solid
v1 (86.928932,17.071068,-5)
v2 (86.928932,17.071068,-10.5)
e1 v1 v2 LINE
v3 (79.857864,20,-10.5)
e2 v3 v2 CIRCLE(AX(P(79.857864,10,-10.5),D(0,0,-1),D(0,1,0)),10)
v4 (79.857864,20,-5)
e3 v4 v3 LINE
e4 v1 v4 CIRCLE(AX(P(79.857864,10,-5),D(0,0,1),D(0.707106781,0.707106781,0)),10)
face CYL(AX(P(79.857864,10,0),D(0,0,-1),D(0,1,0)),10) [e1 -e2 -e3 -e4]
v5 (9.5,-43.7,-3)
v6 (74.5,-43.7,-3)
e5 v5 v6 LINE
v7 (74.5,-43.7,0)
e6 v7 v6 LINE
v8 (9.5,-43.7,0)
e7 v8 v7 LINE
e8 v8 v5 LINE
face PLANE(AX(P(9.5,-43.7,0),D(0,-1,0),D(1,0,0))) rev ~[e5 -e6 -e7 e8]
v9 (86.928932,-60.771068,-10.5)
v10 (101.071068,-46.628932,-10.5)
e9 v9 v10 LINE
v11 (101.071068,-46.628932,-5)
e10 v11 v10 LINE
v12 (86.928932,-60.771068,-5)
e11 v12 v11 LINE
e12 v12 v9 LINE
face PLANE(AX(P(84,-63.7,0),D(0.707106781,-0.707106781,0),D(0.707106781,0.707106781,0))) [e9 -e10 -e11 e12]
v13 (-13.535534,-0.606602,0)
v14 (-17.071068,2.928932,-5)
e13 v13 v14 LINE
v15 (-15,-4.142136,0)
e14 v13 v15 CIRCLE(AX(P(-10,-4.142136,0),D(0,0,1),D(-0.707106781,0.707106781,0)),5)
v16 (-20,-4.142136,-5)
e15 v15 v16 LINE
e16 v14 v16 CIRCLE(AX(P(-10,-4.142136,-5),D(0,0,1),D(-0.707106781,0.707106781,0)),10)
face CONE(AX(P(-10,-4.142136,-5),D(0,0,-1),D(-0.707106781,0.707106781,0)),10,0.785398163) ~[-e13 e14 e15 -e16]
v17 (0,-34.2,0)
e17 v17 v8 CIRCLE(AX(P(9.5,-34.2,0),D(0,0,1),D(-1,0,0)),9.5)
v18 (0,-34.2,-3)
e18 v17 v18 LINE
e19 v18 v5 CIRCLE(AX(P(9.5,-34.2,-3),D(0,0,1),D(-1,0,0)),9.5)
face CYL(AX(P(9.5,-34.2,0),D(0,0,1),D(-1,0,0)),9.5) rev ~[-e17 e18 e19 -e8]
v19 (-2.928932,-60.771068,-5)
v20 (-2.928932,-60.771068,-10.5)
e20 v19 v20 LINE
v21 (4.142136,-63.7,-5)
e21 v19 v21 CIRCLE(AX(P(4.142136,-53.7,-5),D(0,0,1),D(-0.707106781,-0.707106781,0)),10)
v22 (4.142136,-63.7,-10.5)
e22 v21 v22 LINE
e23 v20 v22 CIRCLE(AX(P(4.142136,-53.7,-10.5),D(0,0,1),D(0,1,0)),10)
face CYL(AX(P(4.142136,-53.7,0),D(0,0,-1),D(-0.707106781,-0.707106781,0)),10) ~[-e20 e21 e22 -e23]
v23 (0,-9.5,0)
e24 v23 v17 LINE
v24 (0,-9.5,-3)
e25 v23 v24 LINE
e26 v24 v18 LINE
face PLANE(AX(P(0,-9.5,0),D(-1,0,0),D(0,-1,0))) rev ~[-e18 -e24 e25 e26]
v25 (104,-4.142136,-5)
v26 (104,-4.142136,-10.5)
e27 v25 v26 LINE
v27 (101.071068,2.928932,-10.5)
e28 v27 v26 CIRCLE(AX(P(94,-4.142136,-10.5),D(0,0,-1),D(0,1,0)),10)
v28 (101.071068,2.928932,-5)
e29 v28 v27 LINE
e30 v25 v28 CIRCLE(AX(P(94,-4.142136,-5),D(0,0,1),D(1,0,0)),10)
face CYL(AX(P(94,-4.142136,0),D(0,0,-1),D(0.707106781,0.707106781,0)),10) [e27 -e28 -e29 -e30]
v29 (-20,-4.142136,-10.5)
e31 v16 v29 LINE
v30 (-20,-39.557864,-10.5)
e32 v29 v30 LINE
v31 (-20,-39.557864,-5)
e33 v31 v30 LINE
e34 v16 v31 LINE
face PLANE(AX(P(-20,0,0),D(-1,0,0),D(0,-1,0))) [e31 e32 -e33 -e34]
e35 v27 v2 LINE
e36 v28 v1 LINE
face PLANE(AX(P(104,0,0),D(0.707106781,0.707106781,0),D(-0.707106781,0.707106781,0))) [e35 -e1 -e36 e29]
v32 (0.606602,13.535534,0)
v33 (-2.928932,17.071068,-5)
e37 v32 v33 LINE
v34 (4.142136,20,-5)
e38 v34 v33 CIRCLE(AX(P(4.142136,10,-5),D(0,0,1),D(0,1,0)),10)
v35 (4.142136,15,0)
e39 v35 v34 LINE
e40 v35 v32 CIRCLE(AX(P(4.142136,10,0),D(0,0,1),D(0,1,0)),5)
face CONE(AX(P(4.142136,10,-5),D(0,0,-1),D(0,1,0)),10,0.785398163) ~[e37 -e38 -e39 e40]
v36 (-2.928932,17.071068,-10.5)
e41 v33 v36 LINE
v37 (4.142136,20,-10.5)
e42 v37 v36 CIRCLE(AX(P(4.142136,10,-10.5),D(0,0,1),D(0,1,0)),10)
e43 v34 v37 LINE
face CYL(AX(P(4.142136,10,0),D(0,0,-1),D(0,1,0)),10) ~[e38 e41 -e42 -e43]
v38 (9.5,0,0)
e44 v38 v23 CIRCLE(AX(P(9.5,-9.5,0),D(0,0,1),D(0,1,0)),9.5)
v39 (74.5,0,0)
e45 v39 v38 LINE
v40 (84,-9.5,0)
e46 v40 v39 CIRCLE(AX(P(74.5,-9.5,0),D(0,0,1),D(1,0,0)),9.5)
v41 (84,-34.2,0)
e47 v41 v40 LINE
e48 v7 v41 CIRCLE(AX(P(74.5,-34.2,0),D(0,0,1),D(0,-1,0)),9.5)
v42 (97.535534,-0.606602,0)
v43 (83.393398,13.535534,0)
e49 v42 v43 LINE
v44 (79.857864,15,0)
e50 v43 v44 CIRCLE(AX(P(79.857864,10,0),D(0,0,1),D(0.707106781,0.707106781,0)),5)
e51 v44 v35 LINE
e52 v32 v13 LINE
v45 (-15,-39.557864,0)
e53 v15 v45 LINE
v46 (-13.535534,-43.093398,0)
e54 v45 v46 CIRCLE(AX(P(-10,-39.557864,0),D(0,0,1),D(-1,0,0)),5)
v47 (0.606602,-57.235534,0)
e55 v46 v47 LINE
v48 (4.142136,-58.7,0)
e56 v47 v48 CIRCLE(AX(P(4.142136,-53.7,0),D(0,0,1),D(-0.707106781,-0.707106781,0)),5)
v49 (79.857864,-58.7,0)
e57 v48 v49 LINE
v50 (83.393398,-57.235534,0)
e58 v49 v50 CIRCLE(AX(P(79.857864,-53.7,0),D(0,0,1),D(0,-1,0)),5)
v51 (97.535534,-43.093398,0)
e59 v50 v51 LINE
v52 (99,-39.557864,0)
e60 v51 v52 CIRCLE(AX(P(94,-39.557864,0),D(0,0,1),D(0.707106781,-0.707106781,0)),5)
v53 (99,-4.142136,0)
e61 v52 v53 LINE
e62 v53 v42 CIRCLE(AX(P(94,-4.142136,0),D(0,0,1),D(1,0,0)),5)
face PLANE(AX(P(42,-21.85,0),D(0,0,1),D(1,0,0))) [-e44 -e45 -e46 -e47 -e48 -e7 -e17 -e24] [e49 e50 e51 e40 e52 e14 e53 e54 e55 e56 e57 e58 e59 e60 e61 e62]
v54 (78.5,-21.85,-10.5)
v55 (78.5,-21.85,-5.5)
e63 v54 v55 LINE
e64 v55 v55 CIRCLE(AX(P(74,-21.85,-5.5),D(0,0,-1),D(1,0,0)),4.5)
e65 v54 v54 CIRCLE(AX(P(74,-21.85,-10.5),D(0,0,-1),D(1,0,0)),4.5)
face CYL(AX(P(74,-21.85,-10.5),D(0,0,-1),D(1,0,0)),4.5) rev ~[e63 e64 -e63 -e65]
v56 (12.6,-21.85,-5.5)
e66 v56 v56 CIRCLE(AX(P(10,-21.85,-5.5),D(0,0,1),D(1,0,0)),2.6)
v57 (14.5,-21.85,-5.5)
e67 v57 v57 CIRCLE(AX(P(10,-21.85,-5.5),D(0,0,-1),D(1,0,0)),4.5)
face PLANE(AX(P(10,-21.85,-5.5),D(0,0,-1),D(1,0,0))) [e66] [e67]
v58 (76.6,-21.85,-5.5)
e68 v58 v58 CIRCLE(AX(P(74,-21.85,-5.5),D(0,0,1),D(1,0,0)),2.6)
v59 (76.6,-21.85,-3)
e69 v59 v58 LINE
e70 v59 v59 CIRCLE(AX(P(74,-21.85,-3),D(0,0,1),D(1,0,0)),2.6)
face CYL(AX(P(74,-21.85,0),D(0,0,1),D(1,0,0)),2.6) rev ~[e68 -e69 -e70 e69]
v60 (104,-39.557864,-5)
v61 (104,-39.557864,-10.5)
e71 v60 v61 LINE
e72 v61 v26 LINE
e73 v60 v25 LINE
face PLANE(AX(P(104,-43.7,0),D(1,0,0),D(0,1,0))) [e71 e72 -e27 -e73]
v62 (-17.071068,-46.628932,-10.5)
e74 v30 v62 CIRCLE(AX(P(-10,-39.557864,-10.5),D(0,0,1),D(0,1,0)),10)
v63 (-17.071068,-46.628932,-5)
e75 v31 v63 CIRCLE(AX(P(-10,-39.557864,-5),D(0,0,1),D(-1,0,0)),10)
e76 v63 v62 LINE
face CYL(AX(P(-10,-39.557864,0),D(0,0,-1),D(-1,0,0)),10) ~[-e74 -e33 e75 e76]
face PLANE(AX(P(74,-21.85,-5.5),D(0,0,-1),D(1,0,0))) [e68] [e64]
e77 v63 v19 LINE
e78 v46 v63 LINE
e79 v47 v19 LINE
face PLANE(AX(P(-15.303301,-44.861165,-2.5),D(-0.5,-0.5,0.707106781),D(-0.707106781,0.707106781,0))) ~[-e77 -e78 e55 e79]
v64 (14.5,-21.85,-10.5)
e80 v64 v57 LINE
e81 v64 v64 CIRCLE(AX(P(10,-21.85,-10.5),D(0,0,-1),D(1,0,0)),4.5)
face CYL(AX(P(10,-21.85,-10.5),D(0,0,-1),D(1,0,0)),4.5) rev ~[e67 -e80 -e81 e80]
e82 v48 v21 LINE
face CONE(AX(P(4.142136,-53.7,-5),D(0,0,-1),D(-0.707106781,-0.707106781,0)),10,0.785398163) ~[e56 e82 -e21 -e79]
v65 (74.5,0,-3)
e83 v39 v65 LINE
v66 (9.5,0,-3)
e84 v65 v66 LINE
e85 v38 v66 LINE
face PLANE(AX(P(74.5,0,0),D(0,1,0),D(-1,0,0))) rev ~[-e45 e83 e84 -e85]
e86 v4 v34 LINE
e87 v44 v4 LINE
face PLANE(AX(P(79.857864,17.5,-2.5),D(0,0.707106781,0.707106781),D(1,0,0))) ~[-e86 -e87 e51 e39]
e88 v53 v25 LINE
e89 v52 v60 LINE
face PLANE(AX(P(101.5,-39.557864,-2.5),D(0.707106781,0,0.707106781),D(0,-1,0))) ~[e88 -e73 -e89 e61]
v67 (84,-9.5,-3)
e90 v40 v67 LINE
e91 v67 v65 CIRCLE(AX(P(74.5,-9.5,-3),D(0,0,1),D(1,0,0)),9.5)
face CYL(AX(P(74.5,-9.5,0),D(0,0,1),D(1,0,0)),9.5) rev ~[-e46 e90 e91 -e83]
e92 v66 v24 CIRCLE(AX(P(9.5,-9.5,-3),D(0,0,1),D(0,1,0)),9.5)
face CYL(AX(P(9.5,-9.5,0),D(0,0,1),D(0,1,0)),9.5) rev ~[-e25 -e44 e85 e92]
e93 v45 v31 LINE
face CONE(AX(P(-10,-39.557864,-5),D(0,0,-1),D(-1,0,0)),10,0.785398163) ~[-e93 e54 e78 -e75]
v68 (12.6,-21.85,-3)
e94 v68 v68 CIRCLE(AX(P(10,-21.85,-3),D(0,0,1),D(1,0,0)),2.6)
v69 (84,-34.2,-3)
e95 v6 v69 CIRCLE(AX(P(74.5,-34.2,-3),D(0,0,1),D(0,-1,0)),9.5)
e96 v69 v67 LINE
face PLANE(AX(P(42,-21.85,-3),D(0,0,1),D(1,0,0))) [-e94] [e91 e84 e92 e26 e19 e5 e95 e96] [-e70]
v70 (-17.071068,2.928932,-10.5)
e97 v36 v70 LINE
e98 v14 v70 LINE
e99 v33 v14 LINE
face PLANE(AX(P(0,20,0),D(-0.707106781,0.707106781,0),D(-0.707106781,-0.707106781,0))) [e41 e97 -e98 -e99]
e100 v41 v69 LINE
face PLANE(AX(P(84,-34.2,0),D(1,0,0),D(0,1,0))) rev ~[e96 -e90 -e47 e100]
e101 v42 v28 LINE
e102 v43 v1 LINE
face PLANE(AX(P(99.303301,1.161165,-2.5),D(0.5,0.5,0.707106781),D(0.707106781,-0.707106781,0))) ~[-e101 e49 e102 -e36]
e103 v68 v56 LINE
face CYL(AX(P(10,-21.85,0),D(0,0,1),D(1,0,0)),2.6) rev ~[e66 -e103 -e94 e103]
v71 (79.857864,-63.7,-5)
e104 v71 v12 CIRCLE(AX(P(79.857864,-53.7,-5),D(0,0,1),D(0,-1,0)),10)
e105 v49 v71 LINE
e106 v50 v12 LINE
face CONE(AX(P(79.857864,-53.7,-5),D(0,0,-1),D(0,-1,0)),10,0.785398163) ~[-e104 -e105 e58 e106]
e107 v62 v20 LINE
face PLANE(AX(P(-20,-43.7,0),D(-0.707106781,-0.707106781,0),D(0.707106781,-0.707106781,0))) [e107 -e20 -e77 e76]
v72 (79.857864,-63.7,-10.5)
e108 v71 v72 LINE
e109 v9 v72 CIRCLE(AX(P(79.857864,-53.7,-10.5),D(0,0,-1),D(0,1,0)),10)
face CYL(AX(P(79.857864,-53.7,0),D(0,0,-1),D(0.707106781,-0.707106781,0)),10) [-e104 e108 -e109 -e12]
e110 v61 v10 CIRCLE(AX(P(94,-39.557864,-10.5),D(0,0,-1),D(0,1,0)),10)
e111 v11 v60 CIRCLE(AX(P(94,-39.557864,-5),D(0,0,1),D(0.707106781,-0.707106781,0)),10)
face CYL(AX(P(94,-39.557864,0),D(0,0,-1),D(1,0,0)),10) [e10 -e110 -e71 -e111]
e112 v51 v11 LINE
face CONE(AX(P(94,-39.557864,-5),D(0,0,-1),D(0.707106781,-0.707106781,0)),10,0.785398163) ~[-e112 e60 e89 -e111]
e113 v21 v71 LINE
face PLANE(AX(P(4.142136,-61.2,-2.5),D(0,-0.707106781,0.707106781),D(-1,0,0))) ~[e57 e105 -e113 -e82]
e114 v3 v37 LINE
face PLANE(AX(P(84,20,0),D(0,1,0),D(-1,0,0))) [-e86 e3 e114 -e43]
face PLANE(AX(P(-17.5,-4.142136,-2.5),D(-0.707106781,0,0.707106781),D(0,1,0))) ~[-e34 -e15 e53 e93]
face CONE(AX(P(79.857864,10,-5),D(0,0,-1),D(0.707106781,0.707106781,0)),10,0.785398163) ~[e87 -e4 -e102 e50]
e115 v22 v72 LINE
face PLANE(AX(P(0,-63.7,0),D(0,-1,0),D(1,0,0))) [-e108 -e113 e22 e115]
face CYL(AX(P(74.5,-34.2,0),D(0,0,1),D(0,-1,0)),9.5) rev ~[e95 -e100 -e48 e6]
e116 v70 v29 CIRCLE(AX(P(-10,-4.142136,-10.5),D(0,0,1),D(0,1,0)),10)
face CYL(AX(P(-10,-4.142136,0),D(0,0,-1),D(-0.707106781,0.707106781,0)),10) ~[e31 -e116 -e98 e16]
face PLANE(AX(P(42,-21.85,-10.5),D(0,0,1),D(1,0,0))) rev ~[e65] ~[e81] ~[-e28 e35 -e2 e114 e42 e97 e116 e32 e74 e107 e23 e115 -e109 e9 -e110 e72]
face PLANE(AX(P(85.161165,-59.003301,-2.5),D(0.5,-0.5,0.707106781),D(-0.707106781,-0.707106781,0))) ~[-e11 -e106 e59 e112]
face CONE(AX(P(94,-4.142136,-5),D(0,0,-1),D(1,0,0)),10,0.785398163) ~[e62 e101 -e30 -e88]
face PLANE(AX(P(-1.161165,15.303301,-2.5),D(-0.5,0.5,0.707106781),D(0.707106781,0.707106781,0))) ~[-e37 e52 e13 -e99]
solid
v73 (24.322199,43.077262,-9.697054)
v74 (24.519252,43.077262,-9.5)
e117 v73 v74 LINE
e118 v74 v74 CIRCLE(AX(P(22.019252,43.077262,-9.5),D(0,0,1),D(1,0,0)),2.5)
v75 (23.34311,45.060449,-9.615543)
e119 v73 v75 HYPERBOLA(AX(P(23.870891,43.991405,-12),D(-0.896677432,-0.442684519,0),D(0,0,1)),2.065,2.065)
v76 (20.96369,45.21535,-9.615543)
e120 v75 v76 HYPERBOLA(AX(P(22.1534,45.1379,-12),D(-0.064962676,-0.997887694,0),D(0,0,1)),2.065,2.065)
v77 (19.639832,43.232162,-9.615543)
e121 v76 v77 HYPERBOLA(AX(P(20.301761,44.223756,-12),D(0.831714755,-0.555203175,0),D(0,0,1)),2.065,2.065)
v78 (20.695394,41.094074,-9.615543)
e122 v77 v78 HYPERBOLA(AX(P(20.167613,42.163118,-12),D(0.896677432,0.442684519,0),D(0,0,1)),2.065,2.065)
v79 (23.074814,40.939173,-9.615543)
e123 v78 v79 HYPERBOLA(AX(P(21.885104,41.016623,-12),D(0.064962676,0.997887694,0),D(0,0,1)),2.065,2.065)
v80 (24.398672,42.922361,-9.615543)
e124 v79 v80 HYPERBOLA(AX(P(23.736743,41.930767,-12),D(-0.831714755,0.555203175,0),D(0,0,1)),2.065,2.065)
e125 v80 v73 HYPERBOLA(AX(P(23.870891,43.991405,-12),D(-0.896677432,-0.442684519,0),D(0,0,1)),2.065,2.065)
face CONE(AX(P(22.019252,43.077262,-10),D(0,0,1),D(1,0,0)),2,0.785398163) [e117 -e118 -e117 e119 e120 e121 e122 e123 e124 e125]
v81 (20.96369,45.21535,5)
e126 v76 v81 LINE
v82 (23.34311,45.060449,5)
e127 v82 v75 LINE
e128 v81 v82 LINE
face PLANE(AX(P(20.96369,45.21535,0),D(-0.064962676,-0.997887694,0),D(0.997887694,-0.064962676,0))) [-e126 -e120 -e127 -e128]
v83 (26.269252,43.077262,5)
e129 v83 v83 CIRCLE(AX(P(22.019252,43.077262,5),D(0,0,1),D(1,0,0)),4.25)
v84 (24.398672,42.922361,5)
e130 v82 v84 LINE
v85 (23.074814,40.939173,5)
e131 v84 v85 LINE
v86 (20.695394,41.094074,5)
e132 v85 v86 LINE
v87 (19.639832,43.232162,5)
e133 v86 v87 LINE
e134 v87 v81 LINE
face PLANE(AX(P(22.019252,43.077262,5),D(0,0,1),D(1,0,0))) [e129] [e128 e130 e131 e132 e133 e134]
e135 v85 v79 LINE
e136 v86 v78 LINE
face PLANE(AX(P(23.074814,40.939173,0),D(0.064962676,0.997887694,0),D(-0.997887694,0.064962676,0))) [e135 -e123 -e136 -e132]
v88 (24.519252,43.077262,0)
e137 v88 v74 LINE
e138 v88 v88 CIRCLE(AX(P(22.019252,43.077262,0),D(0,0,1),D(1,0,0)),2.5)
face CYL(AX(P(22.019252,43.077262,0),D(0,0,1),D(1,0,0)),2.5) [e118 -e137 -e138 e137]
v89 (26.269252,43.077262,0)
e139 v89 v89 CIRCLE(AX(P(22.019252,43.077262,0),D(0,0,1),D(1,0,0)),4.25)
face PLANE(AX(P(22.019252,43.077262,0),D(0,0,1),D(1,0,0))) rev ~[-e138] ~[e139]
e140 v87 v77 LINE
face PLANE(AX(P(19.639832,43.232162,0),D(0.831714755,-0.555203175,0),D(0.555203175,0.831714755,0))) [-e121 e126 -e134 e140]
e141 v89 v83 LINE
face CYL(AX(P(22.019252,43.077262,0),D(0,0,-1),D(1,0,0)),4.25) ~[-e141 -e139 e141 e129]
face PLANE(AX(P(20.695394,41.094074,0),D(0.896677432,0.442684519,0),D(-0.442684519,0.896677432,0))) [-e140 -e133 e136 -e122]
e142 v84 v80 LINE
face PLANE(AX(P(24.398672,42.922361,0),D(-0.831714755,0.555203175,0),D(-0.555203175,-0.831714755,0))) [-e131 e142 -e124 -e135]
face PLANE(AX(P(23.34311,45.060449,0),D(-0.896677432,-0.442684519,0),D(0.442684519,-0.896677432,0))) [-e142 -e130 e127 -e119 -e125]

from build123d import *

# Parameters (mm, degrees)
F0_R     = 2.6
F1_DEPTH = 10.5
F2_DEPTH = 3
F3_R     = 10
F4_SIZE  = 5
F5_R     = 4.5
F6_DEPTH = 5
F0_R_2   = 4.25
F0_R_3   = 2.5
F7_DEPTH = 5
F8_DEPTH = 10


# Not quite as in the source:
# - a fillet or chamfer that OpenCascade refuses, or shapes differently, is made with other operations: its cross-section is extruded or revolved along the edge and cut away or added


with BuildPart() as f1:
    # F0 (on Top) → F1 (new body)
    with BuildSketch(Plane.XY):
        Polygon((84, 20), (0, 20), (-20, 0), (-20, -43.7), (0, -63.7), (84, -63.7), (104, -43.7), (104, 0), align=None)
        with BuildLine():
            Line((74.5, -43.7), (9.5, -43.7))
            ThreePointArc((9.5, -43.7), (2.7824855787, -40.9175144213), (0, -34.2))
            Line((0, -34.2), (0, -9.5))
            ThreePointArc((0, -9.5), (2.7824855787, -2.7824855787), (9.5, 0))
            Line((9.5, 0), (74.5, 0))
            ThreePointArc((74.5, 0), (81.2175144213, -2.7824855787), (84, -9.5))
            Line((84, -9.5), (84, -34.2))
            ThreePointArc((84, -34.2), (81.2175144213, -40.9175144213), (74.5, -43.7))
        make_face(mode=Mode.SUBTRACT)
        with BuildLine():
            ThreePointArc((0, -34.2), (2.7824855787, -40.9175144213), (9.5, -43.7))
            Line((9.5, -43.7), (74.5, -43.7))
            ThreePointArc((74.5, -43.7), (81.2175144213, -40.9175144213), (84, -34.2))
            Line((84, -34.2), (84, -9.5))
            ThreePointArc((84, -9.5), (81.2175144213, -2.7824855787), (74.5, 0))
            Line((74.5, 0), (9.5, 0))
            ThreePointArc((9.5, 0), (2.7824855787, -2.7824855787), (0, -9.5))
            Line((0, -9.5), (0, -34.2))
        make_face()
        with Locations((10, -21.85)):
            Circle(F0_R, mode=Mode.SUBTRACT)
        with Locations((74, -21.85)):
            Circle(F0_R, mode=Mode.SUBTRACT)
    extrude(amount=-F1_DEPTH)

    # F0 (on Top) → F2 (cut)
    with BuildSketch(Plane.XY):
        with BuildLine():
            ThreePointArc((0, -34.2), (2.7824855787, -40.9175144213), (9.5, -43.7))
            Line((9.5, -43.7), (74.5, -43.7))
            ThreePointArc((74.5, -43.7), (81.2175144213, -40.9175144213), (84, -34.2))
            Line((84, -34.2), (84, -9.5))
            ThreePointArc((84, -9.5), (81.2175144213, -2.7824855787), (74.5, 0))
            Line((74.5, 0), (9.5, 0))
            ThreePointArc((9.5, 0), (2.7824855787, -2.7824855787), (0, -9.5))
            Line((0, -9.5), (0, -34.2))
        make_face()
        with Locations((10, -21.85)):
            Circle(F0_R, mode=Mode.SUBTRACT)
        with Locations((74, -21.85)):
            Circle(F0_R, mode=Mode.SUBTRACT)
    extrude(amount=-F2_DEPTH, mode=Mode.SUBTRACT)

    # F3
    f3_edges = [f1.edges().sort_by_distance(p)[0] for p in [
        (0, 20, -5.25),
        (-20, 0, -5.25),
        (-20, -43.7, -5.25),
        (0, -63.7, -5.25),
        (84, -63.7, -5.25),
        (104, -43.7, -5.25),
        (104, 0, -5.25),
        (84, 20, -5.25),
    ]]
    fillet(f3_edges, radius=F3_R)

    # F4
    f4_edges = [f1.edges().sort_by_distance(p)[0] for p in [
        (42, -63.7, 0),
    ]]
    chamfer(f4_edges, length=F4_SIZE)

    # F5 (on face) → F6 (cut)
    with BuildSketch(Plane(origin=(0, 0, -10.5), x_dir=(1, 0, 0), z_dir=(0, 0, -1))):
        with Locations((74, 21.85)):
            Circle(F5_R)
        with Locations((10, 21.85)):
            Circle(F5_R)
    extrude(amount=-F6_DEPTH, mode=Mode.SUBTRACT)


with BuildPart() as f7:
    # F0 (on Top) → F7 (new body)
    with BuildSketch(Plane.XY):
        with Locations((22.0192523188, 43.0772615533)):
            Circle(F0_R_2)
        with Locations((22.0192523188, 43.0772615533)):
            Circle(F0_R_3, mode=Mode.SUBTRACT)
        with Locations((22.0192523188, 43.0772615533)):
            Circle(F0_R_3)
        Polygon((20.9636902895, 45.2153499835), (23.3431102003, 45.0604493011), (24.3986722296, 42.9223608708), (23.0748143481, 40.939173123), (20.6953944373, 41.0940738055), (19.639832408, 43.2321622357), align=None, mode=Mode.SUBTRACT)
    extrude(amount=F7_DEPTH)

    # F0 (on Top) → F8 (join)
    with BuildSketch(Plane.XY):
        with Locations((22.0192523188, 43.0772615533)):
            Circle(F0_R_3)
        Polygon((20.9636902895, 45.2153499835), (23.3431102003, 45.0604493011), (24.3986722296, 42.9223608708), (23.0748143481, 40.939173123), (20.6953944373, 41.0940738055), (19.639832408, 43.2321622357), align=None, mode=Mode.SUBTRACT)
    extrude(amount=-F8_DEPTH)

    # F9: chamfer of 0.5 on 1 edges, made by hand

    # F9_s1 → F9_t2 (revolve, cut)
    with BuildSketch(Plane.XZ.offset(-43.0772615533)):
        Polygon((24.0192523188, -10), (24.5192523188, -9.5), (24.5192523188, -10), align=None)
    revolve(axis=Axis((22.0192523188, 43.0772615533, -10), (0, 0, 1)), mode=Mode.SUBTRACT)


solid = Compound([f1.part, f7.part])
